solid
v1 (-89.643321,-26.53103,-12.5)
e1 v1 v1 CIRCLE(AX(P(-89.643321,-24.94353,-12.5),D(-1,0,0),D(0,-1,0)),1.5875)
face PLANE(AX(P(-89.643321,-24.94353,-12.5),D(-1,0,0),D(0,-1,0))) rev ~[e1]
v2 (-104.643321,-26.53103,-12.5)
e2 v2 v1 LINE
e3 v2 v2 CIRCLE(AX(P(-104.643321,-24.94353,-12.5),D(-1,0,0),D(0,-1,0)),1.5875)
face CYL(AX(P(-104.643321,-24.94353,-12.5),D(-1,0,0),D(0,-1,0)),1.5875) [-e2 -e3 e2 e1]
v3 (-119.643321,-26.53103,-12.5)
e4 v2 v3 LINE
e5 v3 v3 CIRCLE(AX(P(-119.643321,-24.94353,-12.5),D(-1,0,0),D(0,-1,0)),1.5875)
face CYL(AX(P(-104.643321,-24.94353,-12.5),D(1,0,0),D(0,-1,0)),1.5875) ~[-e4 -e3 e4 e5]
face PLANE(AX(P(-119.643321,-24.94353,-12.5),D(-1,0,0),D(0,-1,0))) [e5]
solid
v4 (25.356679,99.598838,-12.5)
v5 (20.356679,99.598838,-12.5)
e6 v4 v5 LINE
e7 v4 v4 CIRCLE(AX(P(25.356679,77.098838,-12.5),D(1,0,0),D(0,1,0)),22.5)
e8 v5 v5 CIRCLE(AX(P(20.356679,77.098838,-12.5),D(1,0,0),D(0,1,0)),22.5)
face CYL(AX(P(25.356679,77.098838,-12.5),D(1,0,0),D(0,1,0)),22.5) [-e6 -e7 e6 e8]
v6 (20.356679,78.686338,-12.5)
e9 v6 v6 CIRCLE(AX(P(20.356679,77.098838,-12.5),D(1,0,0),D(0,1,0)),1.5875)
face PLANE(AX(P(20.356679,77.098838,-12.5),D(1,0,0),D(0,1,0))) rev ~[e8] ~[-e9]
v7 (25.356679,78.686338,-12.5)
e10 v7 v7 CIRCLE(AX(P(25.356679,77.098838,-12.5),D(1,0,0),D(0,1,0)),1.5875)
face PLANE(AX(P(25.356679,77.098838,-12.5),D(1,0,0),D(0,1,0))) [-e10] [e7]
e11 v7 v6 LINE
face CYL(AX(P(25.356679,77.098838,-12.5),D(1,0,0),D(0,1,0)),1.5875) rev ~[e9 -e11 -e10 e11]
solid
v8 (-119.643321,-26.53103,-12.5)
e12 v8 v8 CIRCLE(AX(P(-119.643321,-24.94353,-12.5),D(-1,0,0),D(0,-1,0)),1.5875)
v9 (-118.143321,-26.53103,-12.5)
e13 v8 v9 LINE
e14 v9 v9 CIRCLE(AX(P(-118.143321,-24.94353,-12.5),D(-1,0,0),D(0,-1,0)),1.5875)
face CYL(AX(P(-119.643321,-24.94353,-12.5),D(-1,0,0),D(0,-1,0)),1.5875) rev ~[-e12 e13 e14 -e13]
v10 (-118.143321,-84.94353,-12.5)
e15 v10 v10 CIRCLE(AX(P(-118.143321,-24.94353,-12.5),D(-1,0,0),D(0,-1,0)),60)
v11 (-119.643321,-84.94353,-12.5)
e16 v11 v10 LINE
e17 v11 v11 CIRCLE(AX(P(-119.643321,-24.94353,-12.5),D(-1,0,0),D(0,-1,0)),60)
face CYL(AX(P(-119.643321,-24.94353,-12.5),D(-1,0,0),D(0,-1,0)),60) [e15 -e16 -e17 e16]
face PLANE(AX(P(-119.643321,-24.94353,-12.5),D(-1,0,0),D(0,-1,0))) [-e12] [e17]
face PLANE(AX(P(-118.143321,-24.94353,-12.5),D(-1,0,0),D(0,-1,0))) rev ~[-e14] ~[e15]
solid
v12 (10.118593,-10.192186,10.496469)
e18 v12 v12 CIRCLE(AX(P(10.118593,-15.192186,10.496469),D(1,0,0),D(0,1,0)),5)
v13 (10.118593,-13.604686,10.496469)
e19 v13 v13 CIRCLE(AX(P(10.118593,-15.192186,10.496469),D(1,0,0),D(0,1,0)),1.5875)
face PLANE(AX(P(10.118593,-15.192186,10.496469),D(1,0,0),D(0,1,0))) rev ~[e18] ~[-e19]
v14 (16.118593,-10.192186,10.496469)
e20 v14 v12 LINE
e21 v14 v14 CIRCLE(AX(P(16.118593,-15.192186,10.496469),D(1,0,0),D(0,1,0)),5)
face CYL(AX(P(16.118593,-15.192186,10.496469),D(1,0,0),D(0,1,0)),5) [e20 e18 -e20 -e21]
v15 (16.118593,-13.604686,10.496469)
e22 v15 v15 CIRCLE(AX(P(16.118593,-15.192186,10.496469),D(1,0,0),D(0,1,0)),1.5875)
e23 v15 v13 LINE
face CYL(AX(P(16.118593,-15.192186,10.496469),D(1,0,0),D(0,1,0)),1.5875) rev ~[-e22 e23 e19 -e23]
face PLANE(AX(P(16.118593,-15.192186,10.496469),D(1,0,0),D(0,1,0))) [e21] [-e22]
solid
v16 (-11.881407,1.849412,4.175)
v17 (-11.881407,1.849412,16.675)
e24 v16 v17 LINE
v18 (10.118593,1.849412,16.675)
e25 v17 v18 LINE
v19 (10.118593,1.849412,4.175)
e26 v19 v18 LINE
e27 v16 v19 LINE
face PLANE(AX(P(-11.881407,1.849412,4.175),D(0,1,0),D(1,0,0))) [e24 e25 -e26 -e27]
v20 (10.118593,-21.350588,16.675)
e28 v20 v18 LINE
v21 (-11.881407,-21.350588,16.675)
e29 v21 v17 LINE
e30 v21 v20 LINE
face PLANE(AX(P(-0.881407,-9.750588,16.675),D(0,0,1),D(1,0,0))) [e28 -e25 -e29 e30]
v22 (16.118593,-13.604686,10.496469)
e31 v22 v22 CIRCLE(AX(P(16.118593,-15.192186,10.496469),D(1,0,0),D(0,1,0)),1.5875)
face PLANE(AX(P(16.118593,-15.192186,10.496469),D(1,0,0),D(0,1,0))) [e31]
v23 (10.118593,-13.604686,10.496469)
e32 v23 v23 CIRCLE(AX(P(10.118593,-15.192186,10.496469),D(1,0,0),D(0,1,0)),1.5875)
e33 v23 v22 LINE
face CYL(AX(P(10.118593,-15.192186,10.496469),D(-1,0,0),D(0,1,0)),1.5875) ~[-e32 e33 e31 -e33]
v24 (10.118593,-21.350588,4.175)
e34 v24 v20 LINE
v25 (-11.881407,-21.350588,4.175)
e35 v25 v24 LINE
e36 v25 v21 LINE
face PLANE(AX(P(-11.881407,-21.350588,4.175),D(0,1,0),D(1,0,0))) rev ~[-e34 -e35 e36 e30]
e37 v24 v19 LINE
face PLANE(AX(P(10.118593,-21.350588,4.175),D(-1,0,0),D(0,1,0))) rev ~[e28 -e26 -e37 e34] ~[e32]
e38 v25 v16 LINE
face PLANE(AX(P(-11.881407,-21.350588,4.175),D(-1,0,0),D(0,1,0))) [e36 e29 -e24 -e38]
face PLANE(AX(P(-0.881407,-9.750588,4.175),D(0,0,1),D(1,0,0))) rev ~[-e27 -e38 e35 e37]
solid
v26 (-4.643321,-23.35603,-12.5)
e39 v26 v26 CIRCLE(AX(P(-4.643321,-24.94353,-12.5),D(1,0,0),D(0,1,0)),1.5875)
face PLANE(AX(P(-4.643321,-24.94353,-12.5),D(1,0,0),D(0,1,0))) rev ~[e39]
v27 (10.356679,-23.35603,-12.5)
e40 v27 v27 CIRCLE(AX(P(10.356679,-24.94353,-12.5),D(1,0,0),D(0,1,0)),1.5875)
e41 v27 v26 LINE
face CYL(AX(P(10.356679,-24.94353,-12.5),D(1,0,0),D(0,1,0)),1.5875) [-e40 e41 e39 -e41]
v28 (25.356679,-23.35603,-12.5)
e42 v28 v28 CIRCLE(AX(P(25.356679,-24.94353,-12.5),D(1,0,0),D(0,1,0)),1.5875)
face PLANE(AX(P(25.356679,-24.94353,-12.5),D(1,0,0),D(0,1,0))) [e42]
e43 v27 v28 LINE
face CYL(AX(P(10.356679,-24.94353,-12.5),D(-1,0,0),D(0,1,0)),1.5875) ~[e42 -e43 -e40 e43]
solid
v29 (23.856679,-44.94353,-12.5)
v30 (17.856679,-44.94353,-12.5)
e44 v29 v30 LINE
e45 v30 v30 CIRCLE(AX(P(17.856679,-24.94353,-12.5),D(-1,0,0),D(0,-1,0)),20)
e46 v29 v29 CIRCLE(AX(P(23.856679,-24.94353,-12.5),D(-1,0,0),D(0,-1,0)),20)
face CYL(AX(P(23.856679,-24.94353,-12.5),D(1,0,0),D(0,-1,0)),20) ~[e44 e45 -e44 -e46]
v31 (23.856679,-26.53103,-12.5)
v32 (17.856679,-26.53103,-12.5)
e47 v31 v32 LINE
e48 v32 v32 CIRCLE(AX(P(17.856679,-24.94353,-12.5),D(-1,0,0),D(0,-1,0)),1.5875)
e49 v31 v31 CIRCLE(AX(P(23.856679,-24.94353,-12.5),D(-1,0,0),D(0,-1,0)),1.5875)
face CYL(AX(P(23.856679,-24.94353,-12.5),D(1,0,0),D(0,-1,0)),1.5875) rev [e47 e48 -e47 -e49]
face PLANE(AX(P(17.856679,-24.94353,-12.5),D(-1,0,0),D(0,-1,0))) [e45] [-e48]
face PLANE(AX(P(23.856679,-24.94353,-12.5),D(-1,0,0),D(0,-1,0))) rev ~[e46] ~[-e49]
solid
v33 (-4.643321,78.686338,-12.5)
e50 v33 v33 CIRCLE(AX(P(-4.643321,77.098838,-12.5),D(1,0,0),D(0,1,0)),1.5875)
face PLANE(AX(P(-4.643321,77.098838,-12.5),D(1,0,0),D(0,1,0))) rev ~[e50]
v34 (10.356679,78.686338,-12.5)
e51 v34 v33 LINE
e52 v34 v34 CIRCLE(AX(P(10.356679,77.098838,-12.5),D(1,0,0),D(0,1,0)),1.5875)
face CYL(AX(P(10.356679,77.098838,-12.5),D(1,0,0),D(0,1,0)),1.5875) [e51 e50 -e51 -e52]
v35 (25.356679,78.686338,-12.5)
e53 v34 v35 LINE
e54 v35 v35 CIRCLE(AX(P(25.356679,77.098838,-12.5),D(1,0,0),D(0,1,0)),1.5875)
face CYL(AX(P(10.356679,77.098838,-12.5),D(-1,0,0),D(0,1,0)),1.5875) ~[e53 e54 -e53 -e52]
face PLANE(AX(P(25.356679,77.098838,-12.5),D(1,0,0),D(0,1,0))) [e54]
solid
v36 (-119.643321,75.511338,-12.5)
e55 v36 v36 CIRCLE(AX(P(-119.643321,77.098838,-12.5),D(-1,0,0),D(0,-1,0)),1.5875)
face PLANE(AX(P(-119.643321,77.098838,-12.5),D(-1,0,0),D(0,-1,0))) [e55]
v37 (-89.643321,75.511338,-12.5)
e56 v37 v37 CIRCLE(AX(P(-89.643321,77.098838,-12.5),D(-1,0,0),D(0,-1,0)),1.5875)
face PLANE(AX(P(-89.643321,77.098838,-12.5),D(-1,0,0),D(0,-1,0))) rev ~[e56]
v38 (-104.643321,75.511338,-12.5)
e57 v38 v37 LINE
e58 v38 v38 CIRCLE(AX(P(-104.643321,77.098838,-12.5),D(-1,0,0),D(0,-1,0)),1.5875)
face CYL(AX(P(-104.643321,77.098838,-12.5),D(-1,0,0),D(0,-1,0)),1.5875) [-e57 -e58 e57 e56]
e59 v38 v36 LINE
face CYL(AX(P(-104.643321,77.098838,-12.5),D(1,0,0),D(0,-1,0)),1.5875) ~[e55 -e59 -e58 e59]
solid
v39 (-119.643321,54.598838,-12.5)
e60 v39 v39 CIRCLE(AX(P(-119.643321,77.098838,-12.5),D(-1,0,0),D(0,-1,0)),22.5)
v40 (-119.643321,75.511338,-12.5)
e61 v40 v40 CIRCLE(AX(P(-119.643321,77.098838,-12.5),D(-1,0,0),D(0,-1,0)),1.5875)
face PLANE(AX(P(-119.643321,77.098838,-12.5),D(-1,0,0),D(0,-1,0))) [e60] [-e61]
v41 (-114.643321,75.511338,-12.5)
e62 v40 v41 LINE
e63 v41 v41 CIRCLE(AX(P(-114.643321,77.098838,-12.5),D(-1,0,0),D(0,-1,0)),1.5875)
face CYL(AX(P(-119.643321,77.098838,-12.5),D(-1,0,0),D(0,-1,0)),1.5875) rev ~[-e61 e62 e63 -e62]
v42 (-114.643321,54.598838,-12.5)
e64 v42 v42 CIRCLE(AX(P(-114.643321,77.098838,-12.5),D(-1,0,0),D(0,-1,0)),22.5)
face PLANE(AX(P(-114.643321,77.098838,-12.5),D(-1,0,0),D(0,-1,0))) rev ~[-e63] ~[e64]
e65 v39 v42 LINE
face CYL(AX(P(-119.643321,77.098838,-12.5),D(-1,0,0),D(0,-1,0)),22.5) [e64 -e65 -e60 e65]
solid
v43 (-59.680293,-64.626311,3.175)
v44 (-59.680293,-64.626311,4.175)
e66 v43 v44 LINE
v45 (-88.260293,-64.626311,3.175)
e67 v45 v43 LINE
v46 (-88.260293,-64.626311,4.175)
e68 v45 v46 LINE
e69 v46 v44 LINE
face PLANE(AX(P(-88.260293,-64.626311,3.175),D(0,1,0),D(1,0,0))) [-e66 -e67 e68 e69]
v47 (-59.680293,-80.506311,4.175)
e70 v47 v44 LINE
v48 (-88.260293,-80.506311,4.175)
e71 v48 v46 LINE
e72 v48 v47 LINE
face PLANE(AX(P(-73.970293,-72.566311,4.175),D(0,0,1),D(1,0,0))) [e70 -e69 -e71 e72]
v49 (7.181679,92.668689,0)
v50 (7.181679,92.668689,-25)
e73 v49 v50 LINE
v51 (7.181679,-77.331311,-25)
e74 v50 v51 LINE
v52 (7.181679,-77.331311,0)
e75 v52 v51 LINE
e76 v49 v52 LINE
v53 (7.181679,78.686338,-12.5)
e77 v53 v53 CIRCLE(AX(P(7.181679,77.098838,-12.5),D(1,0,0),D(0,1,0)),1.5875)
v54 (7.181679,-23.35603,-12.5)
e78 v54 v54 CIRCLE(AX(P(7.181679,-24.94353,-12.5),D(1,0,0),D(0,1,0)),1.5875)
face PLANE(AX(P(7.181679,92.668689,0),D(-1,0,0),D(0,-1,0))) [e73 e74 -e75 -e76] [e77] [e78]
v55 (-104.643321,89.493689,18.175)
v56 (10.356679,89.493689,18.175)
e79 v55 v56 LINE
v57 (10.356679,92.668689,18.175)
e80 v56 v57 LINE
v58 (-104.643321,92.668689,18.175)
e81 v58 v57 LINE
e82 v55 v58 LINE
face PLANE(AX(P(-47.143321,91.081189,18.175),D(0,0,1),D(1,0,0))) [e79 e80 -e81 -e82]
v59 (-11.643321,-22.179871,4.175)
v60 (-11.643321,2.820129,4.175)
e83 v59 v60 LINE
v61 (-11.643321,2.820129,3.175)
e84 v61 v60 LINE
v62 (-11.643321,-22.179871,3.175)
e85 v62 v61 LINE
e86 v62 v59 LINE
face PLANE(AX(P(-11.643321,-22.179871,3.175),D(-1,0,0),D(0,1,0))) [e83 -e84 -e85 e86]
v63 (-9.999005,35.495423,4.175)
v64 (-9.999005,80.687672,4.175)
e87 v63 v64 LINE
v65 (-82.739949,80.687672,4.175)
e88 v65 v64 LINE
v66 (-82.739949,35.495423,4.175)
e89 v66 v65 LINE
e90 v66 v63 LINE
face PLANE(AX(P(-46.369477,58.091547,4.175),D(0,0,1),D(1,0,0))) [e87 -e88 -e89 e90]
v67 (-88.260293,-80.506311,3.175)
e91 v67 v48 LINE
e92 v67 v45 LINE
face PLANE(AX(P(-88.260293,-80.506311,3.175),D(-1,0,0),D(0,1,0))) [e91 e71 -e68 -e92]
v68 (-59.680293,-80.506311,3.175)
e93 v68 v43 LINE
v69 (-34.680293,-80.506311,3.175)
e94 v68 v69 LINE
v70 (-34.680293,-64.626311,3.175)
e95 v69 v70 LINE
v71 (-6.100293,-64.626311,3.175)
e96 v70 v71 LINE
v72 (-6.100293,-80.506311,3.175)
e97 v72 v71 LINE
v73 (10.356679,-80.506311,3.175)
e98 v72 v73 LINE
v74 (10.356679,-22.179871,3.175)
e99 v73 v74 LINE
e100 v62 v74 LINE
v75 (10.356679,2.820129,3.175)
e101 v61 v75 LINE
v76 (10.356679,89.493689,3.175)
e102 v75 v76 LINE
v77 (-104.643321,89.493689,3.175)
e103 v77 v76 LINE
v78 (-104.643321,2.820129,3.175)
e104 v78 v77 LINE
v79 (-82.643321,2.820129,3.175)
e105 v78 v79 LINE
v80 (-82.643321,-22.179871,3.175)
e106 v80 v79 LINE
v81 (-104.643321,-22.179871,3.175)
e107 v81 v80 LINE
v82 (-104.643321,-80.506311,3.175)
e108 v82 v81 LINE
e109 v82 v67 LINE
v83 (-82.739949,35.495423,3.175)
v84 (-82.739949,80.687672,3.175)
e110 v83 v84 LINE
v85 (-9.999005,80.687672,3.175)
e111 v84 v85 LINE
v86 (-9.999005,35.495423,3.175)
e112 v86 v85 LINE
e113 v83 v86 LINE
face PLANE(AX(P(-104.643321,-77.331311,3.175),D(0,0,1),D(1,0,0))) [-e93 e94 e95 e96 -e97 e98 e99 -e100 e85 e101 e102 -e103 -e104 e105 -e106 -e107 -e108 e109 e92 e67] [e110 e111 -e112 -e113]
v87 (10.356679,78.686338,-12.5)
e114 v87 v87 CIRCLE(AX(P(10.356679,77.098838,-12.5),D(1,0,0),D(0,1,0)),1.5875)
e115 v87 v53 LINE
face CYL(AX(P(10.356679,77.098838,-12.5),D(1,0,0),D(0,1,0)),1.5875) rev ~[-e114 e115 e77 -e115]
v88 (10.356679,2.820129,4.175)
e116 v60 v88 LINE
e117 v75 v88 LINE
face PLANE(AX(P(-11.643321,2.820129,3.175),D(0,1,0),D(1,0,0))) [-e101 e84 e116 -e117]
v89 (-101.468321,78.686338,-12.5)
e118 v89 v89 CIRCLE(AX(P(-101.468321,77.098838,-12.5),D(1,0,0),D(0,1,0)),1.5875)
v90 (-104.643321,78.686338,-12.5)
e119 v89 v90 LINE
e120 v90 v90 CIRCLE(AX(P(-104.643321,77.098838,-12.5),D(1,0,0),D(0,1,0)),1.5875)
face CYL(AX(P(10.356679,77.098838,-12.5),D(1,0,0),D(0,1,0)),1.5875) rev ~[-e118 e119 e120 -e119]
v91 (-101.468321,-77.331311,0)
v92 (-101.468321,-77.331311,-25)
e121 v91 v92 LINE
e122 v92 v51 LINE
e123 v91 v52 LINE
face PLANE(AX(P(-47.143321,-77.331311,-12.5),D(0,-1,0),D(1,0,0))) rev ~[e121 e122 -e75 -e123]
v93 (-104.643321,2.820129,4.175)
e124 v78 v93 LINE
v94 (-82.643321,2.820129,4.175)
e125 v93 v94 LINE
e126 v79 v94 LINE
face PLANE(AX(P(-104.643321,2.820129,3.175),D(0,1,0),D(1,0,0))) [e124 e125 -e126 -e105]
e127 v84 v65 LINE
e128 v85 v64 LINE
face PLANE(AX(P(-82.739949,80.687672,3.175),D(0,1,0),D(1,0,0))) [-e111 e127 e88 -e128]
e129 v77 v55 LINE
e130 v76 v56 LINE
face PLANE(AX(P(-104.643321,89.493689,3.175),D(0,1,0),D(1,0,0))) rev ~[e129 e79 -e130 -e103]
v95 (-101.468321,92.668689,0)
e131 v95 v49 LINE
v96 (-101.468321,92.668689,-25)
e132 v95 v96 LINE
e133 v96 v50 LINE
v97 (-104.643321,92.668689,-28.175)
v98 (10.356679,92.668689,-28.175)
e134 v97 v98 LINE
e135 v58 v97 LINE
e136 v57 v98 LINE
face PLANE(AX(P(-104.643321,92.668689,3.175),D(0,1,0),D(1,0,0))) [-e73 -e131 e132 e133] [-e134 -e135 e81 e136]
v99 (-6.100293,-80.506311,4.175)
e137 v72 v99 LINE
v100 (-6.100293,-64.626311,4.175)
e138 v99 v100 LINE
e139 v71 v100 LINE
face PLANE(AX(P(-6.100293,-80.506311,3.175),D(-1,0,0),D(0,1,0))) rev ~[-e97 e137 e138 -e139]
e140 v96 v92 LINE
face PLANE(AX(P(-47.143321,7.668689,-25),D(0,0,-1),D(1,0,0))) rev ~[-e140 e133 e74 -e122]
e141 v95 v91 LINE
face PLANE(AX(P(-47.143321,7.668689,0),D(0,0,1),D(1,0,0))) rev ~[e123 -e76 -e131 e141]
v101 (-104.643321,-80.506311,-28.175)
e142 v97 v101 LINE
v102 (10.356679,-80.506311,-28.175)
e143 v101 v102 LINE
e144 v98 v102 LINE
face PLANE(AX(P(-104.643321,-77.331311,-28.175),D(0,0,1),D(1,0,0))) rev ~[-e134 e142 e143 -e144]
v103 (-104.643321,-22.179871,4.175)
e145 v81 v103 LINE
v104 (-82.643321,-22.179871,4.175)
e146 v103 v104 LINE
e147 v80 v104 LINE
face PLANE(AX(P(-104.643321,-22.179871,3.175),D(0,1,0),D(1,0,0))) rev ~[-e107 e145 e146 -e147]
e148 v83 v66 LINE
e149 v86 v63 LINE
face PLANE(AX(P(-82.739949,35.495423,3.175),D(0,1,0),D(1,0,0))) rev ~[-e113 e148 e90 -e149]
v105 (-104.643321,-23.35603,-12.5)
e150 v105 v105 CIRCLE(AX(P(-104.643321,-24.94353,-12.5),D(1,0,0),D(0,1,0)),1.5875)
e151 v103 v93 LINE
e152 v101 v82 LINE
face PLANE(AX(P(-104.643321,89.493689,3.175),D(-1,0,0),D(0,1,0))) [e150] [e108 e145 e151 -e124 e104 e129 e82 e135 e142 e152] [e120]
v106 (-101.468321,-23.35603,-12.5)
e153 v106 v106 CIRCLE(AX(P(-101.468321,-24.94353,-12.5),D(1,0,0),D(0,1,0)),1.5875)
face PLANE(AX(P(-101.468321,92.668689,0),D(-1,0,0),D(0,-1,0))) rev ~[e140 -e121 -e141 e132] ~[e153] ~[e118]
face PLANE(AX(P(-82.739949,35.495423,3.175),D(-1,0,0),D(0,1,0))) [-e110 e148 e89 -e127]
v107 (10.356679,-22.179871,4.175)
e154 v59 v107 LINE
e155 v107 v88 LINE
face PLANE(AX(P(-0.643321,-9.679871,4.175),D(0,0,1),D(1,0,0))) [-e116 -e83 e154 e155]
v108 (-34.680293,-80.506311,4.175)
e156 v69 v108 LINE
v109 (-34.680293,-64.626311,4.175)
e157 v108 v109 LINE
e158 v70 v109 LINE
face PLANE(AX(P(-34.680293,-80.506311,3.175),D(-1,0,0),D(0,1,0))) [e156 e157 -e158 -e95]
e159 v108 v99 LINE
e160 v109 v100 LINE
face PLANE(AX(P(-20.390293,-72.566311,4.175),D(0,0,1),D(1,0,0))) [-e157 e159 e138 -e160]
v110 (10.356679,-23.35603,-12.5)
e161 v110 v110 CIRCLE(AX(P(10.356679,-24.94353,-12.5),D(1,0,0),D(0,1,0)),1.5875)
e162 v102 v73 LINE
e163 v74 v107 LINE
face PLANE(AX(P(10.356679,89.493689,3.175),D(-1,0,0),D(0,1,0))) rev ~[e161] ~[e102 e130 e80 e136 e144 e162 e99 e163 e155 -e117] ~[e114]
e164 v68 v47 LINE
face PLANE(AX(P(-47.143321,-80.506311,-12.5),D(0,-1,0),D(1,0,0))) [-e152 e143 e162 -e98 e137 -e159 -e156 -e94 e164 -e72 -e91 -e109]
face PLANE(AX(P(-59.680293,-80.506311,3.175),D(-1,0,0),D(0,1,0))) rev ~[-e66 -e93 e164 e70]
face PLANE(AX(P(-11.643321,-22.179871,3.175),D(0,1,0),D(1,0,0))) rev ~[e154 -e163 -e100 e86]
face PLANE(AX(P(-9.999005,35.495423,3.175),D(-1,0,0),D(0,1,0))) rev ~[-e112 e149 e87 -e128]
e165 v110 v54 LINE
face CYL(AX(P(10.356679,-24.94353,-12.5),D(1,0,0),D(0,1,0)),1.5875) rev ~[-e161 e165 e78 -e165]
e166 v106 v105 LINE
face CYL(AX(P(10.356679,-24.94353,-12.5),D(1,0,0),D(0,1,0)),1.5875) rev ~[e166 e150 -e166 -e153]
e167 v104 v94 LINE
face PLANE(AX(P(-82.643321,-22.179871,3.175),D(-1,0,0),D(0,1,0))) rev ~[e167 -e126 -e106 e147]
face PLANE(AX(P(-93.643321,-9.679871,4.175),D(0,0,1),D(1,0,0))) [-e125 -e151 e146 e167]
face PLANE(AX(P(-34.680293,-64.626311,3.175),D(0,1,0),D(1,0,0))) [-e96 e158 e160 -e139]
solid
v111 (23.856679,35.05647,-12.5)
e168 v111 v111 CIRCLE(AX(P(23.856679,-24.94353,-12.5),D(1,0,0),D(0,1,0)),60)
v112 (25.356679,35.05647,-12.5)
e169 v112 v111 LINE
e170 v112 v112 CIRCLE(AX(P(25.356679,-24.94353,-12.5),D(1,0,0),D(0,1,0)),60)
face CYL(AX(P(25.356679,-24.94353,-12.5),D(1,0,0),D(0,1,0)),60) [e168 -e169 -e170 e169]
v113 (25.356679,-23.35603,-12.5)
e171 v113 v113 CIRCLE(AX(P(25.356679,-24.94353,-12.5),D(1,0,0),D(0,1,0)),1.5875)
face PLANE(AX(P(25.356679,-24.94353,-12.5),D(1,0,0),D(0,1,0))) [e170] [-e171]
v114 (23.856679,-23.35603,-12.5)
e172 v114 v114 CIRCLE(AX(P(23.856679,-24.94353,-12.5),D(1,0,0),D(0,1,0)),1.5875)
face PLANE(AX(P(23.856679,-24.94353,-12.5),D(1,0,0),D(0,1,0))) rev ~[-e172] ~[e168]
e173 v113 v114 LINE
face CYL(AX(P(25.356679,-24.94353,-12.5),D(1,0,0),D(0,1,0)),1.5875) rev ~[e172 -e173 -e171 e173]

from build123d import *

# Parameters (mm, degrees)
F0_W      = 115
F0_H      = 170
F1_DEPTH  = 3.175
F2_W      = 3.175
F2_H      = 170
F3_DEPTH  = 25
F4_W      = 115
F4_H      = 170
F5_DEPTH  = 3.175
F6_W      = 115
F6_H      = 31.35
F7_DEPTH  = 3.175
F8_W      = 115
F8_H      = 3.175
F9_DEPTH  = 15
F10_R     = 1.5875
F11_DEPTH = 115.001
F12_R     = 1.5875
F13_DEPTH = 15
F14_R     = 1.5875
F15_DEPTH = 15
F16_R     = 1.5875
F17_DEPTH = 15
F18_R     = 1.5875
F19_DEPTH = 15
F20_R     = 1.5875
F21_DEPTH = 15
F22_R     = 1.5875
F23_DEPTH = 15
F24_R     = 1.5875
F25_DEPTH = 15
F26_R     = 1.5875
F27_DEPTH = 15
F28_R     = 60
F28_R_2   = 1.5875
F29_DEPTH = 1.5
F30_R     = 60
F30_R_2   = 1.5875
F31_DEPTH = 1.5
F32_R     = 22.5
F32_R_2   = 1.5875
F33_DEPTH = 5
F34_R     = 22.5
F34_R_2   = 1.5875
F35_DEPTH = 5
F36_R     = 20
F36_R_2   = 1.5875
F37_DEPTH = 6
F38_W     = 22
F38_H     = 25
F39_DEPTH = 1
F40_W     = 22
F40_H     = 23.2
F41_DEPTH = 12.5
F42_R     = 1.5875
F43_DEPTH = 6
F44_R     = 5
F44_R_2   = 1.5875
F45_DEPTH = 6
F46_W     = 72.7409441024
F46_H     = 45.1922491193
F47_DEPTH = 1
F48_W     = 28.58
F48_H     = 15.88
F49_DEPTH = 1


# Not quite as in the source:
# - a length typed as a fraction of an inch, garbled in the dataset ("3 / 203.2 mm" for 3/8 in), is restored


with BuildPart() as f1:
    # F0 (on Top) → F1 (new body)
    with BuildSketch(Plane.XY):
        with Locations((-47.1433209129, 7.6686888933)):
            Rectangle(F0_W, F0_H)
    extrude(amount=F1_DEPTH)

    # F2 (on face) → F3 (join)
    with BuildSketch(Plane(origin=(0, 0, 0), x_dir=(1, 0, 0), z_dir=(0, 0, -1))):
        with Locations((-103.0558209129, -7.6686888933)):
            Rectangle(F2_W, F2_H)
        with Locations((8.7691790871, -7.6686888933)):
            Rectangle(F2_W, F2_H)
    extrude(amount=F3_DEPTH)

    # F4 (on face) → F5 (join)
    with BuildSketch(Plane(origin=(0, 0, -25), x_dir=(1, 0, 0), z_dir=(0, 0, -1))):
        with Locations((-47.1433209129, -7.6686888933)):
            Rectangle(F4_W, F4_H)
    extrude(amount=F5_DEPTH)

    # F6 (on face) → F7 (join)
    with BuildSketch(Plane.XZ.offset(77.3313111067)):
        with Locations((-47.1433209129, -12.5)):
            Rectangle(F6_W, F6_H)
    extrude(amount=F7_DEPTH)

    # F8 (on face) → F9 (join)
    with BuildSketch(Plane.XY.offset(3.175)):
        with Locations((-47.1433209129, 91.0811888933)):
            Rectangle(F8_W, F8_H)
    extrude(amount=F9_DEPTH)

    # F10 (on face) → F11 (cut, through all)
    with BuildSketch(Plane.YZ.offset(10.3566790871)):
        with Locations((-24.9435301409, -12.5)):
            Circle(F10_R)
        with Locations((77.0988376136, -12.5)):
            Circle(F10_R)
    extrude(amount=-F11_DEPTH, mode=Mode.SUBTRACT)

    # F38 (on face) → F39 (join)
    with BuildSketch(Plane.XY.offset(3.175)):
        with Locations((-0.6433209129, -9.6798711922)):
            Rectangle(F38_W, F38_H)
        with Locations((-93.6433209129, -9.6798711922)):
            Rectangle(F38_W, F38_H)
    extrude(amount=F39_DEPTH)

    # F46 (on face) → F47 (join)
    with BuildSketch(Plane.XY.offset(3.175)):
        with Locations((-46.3694771752, 58.0915473402)):
            Rectangle(F46_W, F46_H)
    extrude(amount=F47_DEPTH)

    # F48 (on face) → F49 (join)
    with BuildSketch(Plane.XY.offset(3.175)):
        with Locations((-73.9702930069, -72.5663111067)):
            Rectangle(F48_W, F48_H)
        with Locations((-20.3902930069, -72.5663111067)):
            Rectangle(F48_W, F48_H)
    extrude(amount=F49_DEPTH)


with BuildPart() as f13:
    # F12 (on face) → F13 (new body)
    with BuildSketch(Plane.YZ.offset(10.3566790871)):
        with Locations((-24.9435301409, -12.5)):
            Circle(F12_R)
    extrude(amount=-F13_DEPTH)

    # F14 (on face) → F15 (join)
    with BuildSketch(Plane.YZ.offset(10.3566790871)):
        with Locations((-24.9435301409, -12.5)):
            Circle(F14_R)
    extrude(amount=F15_DEPTH)


with BuildPart() as f17:
    # F16 (on face) → F17 (new body)
    with BuildSketch(Plane.YZ.offset(10.3566790871)):
        with Locations((77.0988376136, -12.5)):
            Circle(F16_R)
    extrude(amount=-F17_DEPTH)

    # F18 (on face) → F19 (join)
    with BuildSketch(Plane.YZ.offset(10.3566790871)):
        with Locations((77.0988376136, -12.5)):
            Circle(F18_R)
    extrude(amount=F19_DEPTH)


with BuildPart() as f21:
    # F20 (on face) → F21 (new body)
    with BuildSketch(Plane(origin=(-104.6433209129, 0, 0), x_dir=(0, -1, 0), z_dir=(-1, 0, 0))):
        with Locations((24.9435301409, -12.5)):
            Circle(F20_R)
    extrude(amount=-F21_DEPTH)

    # F22 (on face) → F23 (join)
    with BuildSketch(Plane(origin=(-104.6433209129, 0, 0), x_dir=(0, -1, 0), z_dir=(-1, 0, 0))):
        with Locations((24.9435301409, -12.5)):
            Circle(F22_R)
    extrude(amount=F23_DEPTH)


with BuildPart() as f25:
    # F24 (on face) → F25 (new body)
    with BuildSketch(Plane(origin=(-104.6433209129, 0, 0), x_dir=(0, -1, 0), z_dir=(-1, 0, 0))):
        with Locations((-77.0988376136, -12.5)):
            Circle(F24_R)
    extrude(amount=-F25_DEPTH)

    # F26 (on face) → F27 (join)
    with BuildSketch(Plane(origin=(-104.6433209129, 0, 0), x_dir=(0, -1, 0), z_dir=(-1, 0, 0))):
        with Locations((-77.0988376136, -12.5)):
            Circle(F26_R)
    extrude(amount=F27_DEPTH)


with BuildPart() as f29:
    # F28 (on face) → F29 (new body)
    with BuildSketch(Plane(origin=(-119.6433209129, 0, 0), x_dir=(0, -1, 0), z_dir=(-1, 0, 0))):
        with Locations((24.9435301409, -12.5)):
            Circle(F28_R)
        with Locations((24.9435301409, -12.5)):
            Circle(F28_R_2, mode=Mode.SUBTRACT)
    extrude(amount=-F29_DEPTH)


with BuildPart() as f31:
    # F30 (on face) → F31 (new body)
    with BuildSketch(Plane.YZ.offset(25.3566790871)):
        with Locations((-24.9435301409, -12.5)):
            Circle(F30_R)
        with Locations((-24.9435301409, -12.5)):
            Circle(F30_R_2, mode=Mode.SUBTRACT)
    extrude(amount=-F31_DEPTH)


with BuildPart() as f33:
    # F32 (on face) → F33 (new body)
    with BuildSketch(Plane.YZ.offset(25.3566790871)):
        with Locations((77.0988376136, -12.5)):
            Circle(F32_R)
        with Locations((77.0988376136, -12.5)):
            Circle(F32_R_2, mode=Mode.SUBTRACT)
    extrude(amount=-F33_DEPTH)


with BuildPart() as f35:
    # F34 (on face) → F35 (new body)
    with BuildSketch(Plane(origin=(-119.6433209129, 0, 0), x_dir=(0, -1, 0), z_dir=(-1, 0, 0))):
        with Locations((-77.0988376136, -12.5)):
            Circle(F34_R)
        with Locations((-77.0988376136, -12.5)):
            Circle(F34_R_2, mode=Mode.SUBTRACT)
    extrude(amount=-F35_DEPTH)


with BuildPart() as f37:
    # F36 (on face) → F37 (new body)
    with BuildSketch(Plane(origin=(23.8566790871, 0, 0), x_dir=(0, -1, 0), z_dir=(-1, 0, 0))):
        with Locations((24.9435301409, -12.5)):
            Circle(F36_R)
        with Locations((24.9435301409, -12.5)):
            Circle(F36_R_2, mode=Mode.SUBTRACT)
    extrude(amount=F37_DEPTH)


with BuildPart() as f41:
    # F40 (on face) → F41 (new body)
    with BuildSketch(Plane.XY.offset(4.175)):
        with Locations((-0.881407346, -9.7505884518)):
            Rectangle(F40_W, F40_H)
    extrude(amount=F41_DEPTH)

    # F42 (on face) → F43 (join)
    with BuildSketch(Plane.YZ.offset(10.118592654)):
        with Locations((-15.1921858778, 10.4964692146)):
            Circle(F42_R)
    extrude(amount=F43_DEPTH)


with BuildPart() as f45:
    # F44 (on face) → F45 (new body)
    with BuildSketch(Plane.YZ.offset(16.118592654)):
        with Locations((-15.1921858778, 10.4964692146)):
            Circle(F44_R)
        with Locations((-15.1921858778, 10.4964692146)):
            Circle(F44_R_2, mode=Mode.SUBTRACT)
    extrude(amount=-F45_DEPTH)


solid = Compound([f1.part, f13.part, f17.part, f21.part, f25.part, f29.part, f31.part, f33.part, f35.part, f37.part, f41.part, f45.part])
